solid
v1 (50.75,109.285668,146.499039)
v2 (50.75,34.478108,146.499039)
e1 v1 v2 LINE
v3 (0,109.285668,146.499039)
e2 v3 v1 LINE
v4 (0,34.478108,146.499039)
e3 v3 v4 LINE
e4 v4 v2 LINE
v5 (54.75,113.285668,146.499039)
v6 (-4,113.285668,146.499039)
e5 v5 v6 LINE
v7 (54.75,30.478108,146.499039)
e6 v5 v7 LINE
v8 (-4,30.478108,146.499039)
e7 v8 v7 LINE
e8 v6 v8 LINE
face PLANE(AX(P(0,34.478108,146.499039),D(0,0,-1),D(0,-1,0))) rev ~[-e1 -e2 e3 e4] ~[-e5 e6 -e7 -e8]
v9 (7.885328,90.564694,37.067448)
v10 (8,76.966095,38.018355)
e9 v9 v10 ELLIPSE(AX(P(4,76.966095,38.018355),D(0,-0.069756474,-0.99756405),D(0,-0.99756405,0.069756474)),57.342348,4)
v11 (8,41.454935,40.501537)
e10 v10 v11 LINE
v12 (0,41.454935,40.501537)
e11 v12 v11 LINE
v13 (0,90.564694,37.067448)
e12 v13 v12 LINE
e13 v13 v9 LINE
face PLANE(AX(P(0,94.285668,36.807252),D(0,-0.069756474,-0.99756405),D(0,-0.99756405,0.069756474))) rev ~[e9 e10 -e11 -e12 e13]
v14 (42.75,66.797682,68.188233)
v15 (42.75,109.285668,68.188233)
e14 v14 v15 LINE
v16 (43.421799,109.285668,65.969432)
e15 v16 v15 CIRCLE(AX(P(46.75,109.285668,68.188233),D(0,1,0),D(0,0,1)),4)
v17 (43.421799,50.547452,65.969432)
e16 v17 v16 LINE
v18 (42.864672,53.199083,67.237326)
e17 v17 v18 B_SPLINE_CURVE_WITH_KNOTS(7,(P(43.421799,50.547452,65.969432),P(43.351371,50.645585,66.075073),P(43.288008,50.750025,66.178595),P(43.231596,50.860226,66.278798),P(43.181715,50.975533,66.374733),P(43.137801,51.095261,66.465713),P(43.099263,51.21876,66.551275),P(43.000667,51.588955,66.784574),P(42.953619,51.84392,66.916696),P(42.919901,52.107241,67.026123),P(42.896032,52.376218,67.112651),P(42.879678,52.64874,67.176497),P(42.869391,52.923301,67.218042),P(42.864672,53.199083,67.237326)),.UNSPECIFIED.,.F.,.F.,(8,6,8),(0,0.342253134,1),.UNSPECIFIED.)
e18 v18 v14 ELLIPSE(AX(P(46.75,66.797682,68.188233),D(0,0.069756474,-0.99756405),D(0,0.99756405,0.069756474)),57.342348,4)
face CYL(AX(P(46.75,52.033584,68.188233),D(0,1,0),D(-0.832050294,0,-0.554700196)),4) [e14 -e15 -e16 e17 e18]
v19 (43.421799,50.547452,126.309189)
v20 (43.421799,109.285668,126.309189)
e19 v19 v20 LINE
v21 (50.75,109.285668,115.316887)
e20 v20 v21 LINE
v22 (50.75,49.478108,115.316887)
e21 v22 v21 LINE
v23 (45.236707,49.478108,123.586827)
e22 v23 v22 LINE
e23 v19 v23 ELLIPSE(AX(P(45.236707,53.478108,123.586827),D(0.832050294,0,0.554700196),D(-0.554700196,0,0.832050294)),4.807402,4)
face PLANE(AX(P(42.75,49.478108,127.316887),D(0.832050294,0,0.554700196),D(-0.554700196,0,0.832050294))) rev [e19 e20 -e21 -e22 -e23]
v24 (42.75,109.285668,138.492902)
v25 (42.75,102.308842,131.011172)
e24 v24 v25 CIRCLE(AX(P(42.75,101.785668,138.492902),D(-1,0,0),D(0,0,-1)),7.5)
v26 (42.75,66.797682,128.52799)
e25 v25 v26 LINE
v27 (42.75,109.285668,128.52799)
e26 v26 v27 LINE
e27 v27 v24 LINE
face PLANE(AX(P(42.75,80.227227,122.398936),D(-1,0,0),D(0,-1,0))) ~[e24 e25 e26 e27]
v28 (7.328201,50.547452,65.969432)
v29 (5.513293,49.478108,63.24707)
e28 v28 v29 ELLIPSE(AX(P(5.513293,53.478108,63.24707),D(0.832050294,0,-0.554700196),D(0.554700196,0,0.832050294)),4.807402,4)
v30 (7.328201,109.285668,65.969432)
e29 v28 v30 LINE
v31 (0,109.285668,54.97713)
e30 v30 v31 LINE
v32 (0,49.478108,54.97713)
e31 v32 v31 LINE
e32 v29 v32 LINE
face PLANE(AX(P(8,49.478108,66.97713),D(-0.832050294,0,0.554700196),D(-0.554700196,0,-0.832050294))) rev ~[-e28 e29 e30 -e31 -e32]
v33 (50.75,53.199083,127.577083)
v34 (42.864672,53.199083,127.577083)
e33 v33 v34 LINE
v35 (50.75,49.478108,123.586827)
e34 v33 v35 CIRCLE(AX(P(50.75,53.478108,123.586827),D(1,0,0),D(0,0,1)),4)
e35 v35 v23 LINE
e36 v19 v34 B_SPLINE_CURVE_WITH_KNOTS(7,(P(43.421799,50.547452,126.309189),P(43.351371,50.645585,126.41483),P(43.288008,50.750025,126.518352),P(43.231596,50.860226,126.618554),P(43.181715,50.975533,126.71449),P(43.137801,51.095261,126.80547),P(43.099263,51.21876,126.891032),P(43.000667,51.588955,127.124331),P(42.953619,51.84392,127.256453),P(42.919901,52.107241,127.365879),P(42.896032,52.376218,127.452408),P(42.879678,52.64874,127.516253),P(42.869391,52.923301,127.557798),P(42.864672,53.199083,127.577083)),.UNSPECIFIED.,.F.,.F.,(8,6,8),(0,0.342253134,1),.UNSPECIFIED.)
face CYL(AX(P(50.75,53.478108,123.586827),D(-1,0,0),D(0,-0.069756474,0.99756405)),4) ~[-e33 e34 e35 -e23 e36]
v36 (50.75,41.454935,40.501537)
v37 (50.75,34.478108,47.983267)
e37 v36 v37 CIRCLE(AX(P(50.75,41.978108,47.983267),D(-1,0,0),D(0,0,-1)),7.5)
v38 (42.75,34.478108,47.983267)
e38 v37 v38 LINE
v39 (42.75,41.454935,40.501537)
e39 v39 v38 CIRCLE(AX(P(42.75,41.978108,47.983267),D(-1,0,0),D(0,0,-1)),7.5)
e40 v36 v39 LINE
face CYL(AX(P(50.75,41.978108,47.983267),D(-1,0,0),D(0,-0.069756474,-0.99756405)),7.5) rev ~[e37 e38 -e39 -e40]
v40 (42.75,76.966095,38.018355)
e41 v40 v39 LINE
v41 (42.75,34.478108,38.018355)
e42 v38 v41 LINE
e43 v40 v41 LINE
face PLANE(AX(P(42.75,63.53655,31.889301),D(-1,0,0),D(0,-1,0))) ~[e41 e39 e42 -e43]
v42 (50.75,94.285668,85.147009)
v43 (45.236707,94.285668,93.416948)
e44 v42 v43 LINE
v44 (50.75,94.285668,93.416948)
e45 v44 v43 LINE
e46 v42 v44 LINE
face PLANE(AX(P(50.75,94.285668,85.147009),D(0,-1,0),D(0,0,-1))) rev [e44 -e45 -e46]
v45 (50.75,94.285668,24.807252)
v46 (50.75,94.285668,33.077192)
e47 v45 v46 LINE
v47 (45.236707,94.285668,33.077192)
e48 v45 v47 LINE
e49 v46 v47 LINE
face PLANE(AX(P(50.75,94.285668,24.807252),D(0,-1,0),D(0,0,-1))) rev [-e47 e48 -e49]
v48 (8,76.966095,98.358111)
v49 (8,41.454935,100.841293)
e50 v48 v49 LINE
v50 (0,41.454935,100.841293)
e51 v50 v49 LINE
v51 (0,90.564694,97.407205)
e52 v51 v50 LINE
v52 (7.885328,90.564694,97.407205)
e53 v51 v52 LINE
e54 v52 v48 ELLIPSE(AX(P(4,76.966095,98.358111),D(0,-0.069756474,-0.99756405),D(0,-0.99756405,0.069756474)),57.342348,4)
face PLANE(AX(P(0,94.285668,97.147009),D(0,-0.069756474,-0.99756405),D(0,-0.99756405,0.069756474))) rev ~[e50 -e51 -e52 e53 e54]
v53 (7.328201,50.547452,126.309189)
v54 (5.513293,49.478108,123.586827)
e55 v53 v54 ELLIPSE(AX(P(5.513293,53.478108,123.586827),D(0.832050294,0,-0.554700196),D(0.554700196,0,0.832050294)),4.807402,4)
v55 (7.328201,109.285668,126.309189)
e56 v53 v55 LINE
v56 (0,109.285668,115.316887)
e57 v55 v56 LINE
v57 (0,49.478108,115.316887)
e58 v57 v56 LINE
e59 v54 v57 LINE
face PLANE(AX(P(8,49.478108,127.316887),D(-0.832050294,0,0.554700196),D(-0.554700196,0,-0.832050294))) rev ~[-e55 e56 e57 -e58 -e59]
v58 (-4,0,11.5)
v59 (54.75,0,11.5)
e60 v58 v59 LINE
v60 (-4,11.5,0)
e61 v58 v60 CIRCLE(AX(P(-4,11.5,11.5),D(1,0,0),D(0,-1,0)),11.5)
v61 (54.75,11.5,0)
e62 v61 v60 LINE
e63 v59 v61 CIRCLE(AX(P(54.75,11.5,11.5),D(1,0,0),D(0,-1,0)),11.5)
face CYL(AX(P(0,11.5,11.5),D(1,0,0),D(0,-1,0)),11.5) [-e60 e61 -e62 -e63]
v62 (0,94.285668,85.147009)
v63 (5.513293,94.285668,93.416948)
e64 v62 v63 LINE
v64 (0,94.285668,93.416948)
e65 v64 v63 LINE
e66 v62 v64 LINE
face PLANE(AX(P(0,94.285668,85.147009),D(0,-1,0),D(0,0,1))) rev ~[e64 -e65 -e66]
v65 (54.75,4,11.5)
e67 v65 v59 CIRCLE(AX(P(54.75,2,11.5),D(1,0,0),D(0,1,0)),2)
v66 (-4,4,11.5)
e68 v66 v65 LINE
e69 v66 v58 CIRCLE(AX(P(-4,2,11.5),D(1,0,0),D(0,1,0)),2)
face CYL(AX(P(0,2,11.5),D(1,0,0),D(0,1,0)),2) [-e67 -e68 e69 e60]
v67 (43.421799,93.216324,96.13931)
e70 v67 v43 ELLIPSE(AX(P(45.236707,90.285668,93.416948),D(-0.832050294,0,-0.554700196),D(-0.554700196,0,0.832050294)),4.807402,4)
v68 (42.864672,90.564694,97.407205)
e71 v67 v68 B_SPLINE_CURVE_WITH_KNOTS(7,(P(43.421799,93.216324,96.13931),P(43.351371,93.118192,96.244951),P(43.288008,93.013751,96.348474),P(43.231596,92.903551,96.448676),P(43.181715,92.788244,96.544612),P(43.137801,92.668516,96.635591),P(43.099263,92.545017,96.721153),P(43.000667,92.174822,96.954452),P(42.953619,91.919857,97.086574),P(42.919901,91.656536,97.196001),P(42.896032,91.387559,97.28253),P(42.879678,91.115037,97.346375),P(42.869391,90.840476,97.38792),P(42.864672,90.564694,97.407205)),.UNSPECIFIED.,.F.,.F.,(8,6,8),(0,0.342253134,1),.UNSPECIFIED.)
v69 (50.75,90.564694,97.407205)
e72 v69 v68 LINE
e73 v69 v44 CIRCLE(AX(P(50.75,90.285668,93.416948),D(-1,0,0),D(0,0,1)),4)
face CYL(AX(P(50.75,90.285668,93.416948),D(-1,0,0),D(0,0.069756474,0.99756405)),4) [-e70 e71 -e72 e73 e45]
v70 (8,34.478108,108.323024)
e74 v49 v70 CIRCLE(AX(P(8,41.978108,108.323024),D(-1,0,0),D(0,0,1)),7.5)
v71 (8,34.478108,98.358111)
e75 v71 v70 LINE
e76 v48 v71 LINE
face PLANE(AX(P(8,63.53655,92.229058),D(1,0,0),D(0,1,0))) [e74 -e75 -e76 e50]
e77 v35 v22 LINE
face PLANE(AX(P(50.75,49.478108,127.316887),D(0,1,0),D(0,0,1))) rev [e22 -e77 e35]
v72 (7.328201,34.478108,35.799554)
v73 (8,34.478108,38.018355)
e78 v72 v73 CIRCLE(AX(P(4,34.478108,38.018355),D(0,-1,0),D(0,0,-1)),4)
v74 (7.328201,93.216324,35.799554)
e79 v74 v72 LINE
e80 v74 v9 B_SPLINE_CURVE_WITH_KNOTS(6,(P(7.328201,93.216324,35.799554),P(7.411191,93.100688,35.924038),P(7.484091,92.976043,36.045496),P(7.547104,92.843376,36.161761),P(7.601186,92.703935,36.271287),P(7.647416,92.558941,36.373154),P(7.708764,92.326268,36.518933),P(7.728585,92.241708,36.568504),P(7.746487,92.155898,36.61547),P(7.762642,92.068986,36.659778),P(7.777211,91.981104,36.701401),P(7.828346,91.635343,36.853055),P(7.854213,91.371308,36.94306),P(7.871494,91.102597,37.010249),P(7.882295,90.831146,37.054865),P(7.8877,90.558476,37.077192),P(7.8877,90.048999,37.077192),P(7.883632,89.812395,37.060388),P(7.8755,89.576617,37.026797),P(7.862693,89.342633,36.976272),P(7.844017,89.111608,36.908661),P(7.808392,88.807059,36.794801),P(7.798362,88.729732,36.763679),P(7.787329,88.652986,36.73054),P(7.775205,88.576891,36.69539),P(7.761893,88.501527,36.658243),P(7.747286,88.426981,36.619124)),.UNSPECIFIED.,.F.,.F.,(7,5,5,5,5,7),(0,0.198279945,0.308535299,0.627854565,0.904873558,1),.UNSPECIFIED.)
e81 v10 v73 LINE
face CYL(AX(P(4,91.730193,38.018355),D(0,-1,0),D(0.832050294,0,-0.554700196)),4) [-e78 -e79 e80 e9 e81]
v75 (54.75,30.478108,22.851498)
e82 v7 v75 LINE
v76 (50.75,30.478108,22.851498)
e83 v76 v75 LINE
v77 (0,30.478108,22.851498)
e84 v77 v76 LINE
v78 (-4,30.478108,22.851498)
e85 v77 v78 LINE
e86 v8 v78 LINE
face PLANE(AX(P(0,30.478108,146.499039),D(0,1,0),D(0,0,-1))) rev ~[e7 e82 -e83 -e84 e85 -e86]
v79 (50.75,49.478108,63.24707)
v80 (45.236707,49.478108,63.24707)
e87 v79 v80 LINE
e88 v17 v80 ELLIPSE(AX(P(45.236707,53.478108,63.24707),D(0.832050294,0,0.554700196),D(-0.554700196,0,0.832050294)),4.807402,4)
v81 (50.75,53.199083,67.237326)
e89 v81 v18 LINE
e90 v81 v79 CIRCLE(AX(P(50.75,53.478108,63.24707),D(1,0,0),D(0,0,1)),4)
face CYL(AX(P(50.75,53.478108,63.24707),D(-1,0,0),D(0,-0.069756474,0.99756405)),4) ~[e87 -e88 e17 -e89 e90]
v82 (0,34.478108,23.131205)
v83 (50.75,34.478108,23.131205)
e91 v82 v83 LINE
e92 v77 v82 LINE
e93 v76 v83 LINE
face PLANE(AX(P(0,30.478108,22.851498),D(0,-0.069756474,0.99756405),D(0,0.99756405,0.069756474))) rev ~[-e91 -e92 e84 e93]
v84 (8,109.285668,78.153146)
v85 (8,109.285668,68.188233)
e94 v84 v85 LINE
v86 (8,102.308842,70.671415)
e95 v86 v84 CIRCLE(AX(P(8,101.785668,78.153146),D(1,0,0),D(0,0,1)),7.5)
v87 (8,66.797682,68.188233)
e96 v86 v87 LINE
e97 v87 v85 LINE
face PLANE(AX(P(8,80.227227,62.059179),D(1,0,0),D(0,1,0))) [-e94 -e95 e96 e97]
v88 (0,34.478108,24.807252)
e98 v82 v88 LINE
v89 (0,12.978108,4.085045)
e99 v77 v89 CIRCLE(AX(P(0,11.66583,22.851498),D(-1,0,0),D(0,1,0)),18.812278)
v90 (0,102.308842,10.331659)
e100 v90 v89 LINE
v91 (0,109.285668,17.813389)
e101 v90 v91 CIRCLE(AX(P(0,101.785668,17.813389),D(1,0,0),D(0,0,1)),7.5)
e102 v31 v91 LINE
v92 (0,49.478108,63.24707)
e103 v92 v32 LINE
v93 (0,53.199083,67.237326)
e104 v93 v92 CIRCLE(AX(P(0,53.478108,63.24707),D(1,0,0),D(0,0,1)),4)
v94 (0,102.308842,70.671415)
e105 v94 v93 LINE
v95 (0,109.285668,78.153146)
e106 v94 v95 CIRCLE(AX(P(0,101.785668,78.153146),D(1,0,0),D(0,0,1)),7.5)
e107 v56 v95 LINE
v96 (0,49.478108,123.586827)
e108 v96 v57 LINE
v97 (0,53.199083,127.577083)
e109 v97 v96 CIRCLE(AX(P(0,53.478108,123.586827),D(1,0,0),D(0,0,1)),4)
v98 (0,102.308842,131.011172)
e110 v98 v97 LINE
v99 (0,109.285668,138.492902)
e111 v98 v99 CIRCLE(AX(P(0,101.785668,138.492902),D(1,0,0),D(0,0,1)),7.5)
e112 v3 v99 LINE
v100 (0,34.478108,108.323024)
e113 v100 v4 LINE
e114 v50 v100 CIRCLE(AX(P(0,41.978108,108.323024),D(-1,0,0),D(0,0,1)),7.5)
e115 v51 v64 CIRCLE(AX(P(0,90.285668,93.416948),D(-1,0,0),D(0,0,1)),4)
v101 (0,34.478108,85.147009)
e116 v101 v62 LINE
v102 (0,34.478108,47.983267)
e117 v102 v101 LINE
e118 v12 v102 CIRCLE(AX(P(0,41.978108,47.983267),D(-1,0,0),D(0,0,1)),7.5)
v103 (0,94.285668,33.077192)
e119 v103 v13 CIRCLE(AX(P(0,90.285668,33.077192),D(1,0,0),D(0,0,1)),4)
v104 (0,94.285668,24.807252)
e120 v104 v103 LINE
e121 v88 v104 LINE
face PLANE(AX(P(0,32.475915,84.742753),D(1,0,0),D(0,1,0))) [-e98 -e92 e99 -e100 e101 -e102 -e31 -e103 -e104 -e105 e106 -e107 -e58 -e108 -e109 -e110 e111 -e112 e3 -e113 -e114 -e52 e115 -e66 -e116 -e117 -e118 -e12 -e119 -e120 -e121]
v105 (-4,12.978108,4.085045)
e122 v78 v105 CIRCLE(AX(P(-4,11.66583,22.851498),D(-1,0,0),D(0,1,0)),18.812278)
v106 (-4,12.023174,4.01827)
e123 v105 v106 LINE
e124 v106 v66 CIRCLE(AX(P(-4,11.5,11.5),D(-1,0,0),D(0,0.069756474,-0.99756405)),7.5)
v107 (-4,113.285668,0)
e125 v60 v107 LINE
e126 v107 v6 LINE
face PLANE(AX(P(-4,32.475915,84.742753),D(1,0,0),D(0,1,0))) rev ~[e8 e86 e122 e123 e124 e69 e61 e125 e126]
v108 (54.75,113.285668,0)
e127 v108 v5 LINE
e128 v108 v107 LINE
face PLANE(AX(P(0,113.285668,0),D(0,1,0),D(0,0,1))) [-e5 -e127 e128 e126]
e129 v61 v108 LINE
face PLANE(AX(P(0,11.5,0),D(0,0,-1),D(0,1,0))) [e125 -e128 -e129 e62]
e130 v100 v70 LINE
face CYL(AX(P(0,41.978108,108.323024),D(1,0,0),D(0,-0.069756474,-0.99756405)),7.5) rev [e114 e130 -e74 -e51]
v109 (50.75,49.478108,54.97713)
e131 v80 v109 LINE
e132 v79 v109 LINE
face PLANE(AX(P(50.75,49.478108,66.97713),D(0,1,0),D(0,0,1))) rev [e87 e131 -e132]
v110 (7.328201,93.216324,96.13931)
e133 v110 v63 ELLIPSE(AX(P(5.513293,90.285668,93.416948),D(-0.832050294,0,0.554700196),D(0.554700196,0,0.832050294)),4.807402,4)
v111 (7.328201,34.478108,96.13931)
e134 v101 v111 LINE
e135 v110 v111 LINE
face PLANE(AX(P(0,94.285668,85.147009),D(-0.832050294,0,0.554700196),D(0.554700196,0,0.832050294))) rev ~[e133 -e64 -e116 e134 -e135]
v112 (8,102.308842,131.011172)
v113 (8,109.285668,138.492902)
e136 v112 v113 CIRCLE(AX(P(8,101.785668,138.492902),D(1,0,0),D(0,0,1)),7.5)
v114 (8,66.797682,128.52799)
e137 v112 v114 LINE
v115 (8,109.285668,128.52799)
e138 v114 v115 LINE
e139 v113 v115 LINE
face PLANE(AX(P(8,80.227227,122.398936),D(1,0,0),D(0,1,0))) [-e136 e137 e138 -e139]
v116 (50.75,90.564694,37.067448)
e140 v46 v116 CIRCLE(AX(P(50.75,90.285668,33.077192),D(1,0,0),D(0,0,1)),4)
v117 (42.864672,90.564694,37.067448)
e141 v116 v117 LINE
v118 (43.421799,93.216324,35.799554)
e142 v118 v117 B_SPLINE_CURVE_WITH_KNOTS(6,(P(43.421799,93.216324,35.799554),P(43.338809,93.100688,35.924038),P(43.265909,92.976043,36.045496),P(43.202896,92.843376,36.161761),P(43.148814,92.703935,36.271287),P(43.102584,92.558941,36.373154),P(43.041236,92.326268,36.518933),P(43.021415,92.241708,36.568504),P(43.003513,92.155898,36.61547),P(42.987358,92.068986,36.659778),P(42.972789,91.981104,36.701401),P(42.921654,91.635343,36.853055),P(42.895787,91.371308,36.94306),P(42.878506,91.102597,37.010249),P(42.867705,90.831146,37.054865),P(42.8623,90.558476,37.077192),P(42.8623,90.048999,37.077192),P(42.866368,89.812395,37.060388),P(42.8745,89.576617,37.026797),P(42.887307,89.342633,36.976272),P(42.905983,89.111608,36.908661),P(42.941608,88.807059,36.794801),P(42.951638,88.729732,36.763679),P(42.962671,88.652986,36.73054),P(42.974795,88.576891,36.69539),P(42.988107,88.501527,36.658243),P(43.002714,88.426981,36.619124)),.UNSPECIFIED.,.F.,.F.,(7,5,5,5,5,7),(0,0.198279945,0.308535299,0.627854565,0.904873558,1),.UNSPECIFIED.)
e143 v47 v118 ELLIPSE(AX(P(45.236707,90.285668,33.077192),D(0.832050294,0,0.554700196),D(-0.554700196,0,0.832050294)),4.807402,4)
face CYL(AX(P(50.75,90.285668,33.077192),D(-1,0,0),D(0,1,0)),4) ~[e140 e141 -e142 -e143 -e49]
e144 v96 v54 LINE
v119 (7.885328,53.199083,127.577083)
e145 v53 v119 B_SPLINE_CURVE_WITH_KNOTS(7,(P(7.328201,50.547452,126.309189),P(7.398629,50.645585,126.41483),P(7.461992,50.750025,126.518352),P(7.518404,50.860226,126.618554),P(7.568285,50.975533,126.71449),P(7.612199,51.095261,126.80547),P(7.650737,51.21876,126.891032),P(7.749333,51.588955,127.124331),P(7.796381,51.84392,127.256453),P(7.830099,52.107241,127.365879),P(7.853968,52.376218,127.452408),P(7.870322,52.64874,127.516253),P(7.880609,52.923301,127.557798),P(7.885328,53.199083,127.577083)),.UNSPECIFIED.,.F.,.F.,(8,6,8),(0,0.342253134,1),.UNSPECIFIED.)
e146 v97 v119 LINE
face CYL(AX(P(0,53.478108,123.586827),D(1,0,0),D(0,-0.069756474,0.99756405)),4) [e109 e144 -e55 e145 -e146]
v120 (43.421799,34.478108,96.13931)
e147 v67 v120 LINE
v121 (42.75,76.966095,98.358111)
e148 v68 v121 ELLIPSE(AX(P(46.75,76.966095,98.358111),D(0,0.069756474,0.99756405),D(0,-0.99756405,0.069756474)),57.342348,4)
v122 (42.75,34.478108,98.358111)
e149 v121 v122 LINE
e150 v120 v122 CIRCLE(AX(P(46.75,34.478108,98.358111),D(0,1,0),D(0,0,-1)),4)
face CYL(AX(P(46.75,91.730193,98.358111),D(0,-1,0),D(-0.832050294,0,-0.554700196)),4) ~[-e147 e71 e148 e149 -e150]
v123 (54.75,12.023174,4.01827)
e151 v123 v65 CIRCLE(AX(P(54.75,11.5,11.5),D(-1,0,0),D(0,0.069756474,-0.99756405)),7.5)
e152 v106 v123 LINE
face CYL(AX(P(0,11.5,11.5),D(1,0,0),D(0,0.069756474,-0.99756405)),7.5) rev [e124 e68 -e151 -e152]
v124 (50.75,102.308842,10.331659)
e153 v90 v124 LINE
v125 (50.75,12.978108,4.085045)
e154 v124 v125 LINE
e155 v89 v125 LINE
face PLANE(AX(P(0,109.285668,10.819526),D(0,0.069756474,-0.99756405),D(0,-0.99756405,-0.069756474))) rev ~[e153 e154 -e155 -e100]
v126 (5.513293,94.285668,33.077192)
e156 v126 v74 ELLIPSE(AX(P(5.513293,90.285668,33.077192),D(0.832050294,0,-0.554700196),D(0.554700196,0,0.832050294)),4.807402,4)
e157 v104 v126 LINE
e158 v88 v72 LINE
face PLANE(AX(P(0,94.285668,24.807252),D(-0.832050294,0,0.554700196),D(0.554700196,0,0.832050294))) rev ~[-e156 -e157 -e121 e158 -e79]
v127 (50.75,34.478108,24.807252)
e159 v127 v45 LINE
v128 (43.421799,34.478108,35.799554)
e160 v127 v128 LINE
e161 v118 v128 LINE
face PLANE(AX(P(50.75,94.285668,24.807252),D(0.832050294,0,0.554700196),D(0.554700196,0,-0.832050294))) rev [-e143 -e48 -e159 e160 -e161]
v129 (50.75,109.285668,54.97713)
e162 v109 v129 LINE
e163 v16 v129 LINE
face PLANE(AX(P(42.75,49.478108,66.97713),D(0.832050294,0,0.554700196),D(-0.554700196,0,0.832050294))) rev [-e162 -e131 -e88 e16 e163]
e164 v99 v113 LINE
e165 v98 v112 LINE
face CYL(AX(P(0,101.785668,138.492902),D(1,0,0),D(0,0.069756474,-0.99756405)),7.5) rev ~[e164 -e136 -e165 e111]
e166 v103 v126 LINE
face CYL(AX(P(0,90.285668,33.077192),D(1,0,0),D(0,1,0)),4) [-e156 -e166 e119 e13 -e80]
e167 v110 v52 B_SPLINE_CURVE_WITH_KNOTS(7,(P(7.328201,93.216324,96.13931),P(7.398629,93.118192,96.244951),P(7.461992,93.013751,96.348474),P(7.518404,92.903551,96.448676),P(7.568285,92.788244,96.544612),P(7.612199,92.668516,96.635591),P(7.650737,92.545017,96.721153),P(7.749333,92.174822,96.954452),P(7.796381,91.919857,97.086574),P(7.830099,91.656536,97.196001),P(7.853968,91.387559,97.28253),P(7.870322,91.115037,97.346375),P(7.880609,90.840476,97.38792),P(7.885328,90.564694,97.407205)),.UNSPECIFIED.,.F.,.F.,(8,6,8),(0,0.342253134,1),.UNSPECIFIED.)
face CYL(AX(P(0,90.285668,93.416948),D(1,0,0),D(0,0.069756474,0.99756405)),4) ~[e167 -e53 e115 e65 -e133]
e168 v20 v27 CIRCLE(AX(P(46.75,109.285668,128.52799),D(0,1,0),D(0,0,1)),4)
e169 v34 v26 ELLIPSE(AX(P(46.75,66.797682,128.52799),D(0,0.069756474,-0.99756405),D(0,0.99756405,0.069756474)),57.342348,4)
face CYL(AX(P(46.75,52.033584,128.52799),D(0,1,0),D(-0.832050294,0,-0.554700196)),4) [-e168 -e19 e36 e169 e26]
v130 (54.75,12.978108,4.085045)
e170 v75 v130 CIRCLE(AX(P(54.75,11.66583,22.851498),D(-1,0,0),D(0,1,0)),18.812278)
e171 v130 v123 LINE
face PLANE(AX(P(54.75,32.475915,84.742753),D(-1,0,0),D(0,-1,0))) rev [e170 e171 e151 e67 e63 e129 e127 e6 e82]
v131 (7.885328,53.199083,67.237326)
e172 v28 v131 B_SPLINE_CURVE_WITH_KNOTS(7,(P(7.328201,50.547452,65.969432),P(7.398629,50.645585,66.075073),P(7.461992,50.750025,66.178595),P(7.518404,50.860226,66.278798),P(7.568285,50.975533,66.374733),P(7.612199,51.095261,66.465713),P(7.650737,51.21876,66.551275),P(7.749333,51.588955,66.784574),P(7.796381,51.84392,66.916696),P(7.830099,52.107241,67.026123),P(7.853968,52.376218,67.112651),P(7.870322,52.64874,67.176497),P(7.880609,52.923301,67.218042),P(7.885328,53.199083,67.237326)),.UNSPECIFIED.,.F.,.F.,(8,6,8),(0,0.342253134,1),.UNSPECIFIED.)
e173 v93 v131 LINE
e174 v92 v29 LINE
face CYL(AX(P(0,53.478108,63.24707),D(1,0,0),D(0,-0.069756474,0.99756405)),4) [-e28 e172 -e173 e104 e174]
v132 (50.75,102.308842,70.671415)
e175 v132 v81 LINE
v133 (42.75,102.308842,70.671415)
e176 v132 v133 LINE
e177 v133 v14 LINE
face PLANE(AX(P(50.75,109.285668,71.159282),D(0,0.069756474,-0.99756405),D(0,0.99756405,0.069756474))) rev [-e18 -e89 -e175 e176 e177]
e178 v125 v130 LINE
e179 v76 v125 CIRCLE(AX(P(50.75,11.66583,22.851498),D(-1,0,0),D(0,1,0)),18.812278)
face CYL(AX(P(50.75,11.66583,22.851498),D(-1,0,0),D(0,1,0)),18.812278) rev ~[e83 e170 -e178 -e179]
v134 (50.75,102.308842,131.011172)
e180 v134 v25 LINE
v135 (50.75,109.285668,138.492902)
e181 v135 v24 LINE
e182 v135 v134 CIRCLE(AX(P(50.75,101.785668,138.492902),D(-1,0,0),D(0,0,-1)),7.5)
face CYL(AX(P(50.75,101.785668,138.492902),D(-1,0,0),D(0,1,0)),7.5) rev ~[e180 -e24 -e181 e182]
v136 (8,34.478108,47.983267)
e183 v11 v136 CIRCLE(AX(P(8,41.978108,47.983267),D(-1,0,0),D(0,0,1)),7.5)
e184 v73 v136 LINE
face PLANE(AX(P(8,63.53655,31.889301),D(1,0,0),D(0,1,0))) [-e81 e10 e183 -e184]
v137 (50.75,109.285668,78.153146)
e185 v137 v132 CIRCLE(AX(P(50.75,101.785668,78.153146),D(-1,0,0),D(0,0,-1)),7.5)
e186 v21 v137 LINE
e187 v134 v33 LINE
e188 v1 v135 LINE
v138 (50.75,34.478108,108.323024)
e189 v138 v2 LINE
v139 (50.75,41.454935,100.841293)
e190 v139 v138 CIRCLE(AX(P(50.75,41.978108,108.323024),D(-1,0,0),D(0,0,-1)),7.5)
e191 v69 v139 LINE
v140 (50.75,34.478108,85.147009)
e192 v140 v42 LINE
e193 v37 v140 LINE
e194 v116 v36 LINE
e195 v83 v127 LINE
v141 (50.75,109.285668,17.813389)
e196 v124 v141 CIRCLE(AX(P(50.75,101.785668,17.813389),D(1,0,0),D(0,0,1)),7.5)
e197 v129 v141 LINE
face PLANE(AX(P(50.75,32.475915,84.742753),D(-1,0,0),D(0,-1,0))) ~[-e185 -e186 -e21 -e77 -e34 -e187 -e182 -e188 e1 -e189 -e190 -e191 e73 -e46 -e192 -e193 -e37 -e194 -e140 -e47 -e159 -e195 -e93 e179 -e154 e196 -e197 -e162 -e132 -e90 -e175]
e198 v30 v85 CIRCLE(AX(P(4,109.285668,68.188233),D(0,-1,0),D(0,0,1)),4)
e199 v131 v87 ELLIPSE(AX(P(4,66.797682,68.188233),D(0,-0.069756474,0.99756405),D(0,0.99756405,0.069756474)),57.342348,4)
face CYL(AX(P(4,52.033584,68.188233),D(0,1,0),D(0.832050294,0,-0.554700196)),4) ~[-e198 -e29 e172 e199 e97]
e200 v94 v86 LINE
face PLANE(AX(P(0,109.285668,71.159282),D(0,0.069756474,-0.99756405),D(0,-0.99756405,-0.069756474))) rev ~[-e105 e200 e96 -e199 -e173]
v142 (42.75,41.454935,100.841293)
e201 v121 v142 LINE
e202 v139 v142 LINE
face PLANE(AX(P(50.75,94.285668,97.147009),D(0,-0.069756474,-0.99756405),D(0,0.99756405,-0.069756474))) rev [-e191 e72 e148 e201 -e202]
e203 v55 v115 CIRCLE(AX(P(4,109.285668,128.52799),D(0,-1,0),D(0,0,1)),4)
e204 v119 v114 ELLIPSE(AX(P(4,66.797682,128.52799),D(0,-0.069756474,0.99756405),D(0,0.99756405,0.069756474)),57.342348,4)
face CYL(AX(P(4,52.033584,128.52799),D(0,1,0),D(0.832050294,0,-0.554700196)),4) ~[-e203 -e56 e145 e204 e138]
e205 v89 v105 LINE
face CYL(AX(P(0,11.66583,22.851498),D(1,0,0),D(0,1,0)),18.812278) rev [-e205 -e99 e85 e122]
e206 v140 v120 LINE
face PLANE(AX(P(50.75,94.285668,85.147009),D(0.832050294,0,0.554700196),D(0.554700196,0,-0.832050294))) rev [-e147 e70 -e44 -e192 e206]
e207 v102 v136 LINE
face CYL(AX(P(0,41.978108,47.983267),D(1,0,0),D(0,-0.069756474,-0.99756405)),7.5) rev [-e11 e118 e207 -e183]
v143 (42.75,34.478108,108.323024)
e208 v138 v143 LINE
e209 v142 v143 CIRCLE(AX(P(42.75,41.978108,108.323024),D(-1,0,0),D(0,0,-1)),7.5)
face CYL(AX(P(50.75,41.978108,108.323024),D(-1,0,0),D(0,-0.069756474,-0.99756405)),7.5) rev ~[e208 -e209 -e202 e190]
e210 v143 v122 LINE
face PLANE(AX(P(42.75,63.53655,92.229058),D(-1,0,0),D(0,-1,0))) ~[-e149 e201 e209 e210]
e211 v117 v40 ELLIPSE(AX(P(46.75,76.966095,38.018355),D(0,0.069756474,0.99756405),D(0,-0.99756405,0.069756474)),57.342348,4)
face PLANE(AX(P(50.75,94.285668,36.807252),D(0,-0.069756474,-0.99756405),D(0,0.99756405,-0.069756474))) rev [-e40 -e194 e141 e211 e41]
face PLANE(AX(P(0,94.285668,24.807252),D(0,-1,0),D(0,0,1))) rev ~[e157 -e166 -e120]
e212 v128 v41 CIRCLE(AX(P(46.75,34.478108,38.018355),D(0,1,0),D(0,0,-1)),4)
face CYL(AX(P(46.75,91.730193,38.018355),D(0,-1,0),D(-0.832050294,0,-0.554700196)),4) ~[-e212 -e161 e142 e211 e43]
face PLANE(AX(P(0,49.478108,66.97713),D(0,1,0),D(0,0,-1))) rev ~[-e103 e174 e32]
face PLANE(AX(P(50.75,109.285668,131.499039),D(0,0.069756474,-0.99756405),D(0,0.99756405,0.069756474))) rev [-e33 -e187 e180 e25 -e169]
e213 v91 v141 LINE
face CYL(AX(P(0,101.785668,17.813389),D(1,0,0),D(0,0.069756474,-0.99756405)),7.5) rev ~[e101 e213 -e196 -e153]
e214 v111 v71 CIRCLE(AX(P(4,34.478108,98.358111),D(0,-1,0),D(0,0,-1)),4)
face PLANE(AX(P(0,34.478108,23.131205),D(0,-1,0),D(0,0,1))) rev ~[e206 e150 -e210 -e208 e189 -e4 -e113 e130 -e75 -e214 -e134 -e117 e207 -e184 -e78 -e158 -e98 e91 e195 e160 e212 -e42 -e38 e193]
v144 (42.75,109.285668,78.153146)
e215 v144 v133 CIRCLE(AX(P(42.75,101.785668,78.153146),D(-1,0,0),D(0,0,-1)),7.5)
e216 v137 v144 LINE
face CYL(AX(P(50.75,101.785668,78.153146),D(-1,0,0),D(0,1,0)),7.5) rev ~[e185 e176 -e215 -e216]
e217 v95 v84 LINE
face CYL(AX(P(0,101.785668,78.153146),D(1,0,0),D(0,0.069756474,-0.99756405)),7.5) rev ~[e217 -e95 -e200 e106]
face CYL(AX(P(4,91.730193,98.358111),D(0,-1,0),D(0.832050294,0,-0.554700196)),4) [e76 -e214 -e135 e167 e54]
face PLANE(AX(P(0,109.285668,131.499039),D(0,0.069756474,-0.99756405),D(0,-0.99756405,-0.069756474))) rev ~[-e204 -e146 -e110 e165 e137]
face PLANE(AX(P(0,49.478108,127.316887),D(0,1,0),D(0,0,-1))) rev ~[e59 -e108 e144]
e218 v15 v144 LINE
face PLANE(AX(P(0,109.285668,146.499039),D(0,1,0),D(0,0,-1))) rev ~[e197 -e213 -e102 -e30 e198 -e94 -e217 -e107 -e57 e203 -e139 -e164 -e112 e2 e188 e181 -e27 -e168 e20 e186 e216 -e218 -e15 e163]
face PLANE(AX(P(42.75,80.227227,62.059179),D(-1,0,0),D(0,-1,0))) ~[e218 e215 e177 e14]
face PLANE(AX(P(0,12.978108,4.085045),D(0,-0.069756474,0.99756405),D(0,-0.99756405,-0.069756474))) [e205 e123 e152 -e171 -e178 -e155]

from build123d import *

# Parameters (mm, degrees)
F1_DEPTH  = 4
F2_DEPTH  = 8
F4_DEPTH  = 59.8075599705
F6_DEPTH  = 59.8075599705
F8_DEPTH  = 59.8075599705
F10_DEPTH = 59.8075599705
F11_F1_R  = 4
F11_F2_R  = 4
F11_F3_R  = 4
F11_F4_R  = 4
F11_F5_R  = 4
F11_F6_R  = 4
F11_F7_R  = 4
F11_F8_R  = 4
F14_DEPTH = 50.75
F15_R     = 7.5


with BuildPart() as f1:
    # F0 (on Right) → F1 (new body)
    with BuildSketch(Plane.YZ):
        Polygon((34.4781084829, 146.4990389768), (30.4781084829, 146.4990389768), (30.4781084829, 22.8514976037), (34.4781084829, 23.1312048515), (34.4781084829, 24.8072521052), (34.4781084829, 40.989404104), (34.4781084829, 85.147008687), (34.4781084829, 101.3291606859), align=None)
        Polygon((109.2856684534, 146.4990389768), (34.4781084829, 146.4990389768), (34.4781084829, 101.3291606859), (94.2856684534, 97.147008687), (94.2856684534, 85.147008687), (34.4781084829, 85.147008687), (34.4781084829, 40.989404104), (94.2856684534, 36.8072521052), (94.2856684534, 24.8072521052), (34.4781084829, 24.8072521052), (34.4781084829, 23.1312048515), (30.4781084829, 22.8514976037), (30.4781084829, 5.3087643873), (109.2856684534, 10.8195258131), (109.2856684534, 54.9771303961), (49.4781084829, 54.9771303961), (49.4781084829, 66.9771303961), (109.2856684534, 71.159282395), (109.2856684534, 115.3168869779), (49.4781084829, 115.3168869779), (49.4781084829, 127.3168869779), (109.2856684534, 131.4990389768), align=None)
        Polygon((109.2856684534, 115.3168869779), (109.2856684534, 131.4990389768), (49.4781084829, 127.3168869779), (49.4781084829, 115.3168869779), align=None)
        Polygon((94.2856684534, 97.147008687), (34.4781084829, 101.3291606859), (34.4781084829, 85.147008687), (94.2856684534, 85.147008687), align=None)
        Polygon((49.4781084829, 54.9771303961), (109.2856684534, 54.9771303961), (109.2856684534, 71.159282395), (49.4781084829, 66.9771303961), align=None)
        Polygon((34.4781084829, 40.989404104), (34.4781084829, 24.8072521052), (94.2856684534, 24.8072521052), (94.2856684534, 36.8072521052), align=None)
        Polygon((113.2856684534, 146.4990389768), (109.2856684534, 146.4990389768), (109.2856684534, 131.4990389768), (109.2856684534, 115.3168869779), (109.2856684534, 71.159282395), (109.2856684534, 54.9771303961), (109.2856684534, 10.8195258131), (30.4781084829, 5.3087643873), (30.4781084829, 0), (113.2856684534, 0), align=None)
        with BuildLine():
            Line((30.4781084829, 0), (30.4781084829, 5.3087643873))
            Line((30.4781084829, 5.3087643873), (12.9781084829, 4.0850451783))
            Line((12.9781084829, 4.0850451783), (12.0231735531, 4.0182696231))
            ThreePointArc((12.0231735531, 4.0182696231), (6.3850122995, 6.0148472379), (4, 11.5))
            ThreePointArc((4, 11.5), (2, 13.5), (0, 11.5))
            ThreePointArc((0, 11.5), (3.3682720164, 3.3682720164), (11.5, 0))
            Line((11.5, 0), (30.4781084829, 0))
        make_face()
        with BuildLine():
            Line((30.4781084829, 5.3087643873), (30.4781084829, 22.8514976037))
            ThreePointArc((30.4781084829, 22.8514976037), (25.4242595831, 10.0215547294), (12.9781084829, 4.0850451783))
            Line((12.9781084829, 4.0850451783), (30.4781084829, 5.3087643873))
        make_face()
    extrude(amount=-F1_DEPTH)

    # F0 (on Right) → F2 (join)
    with BuildSketch(Plane.YZ):
        Polygon((109.2856684534, 115.3168869779), (109.2856684534, 131.4990389768), (49.4781084829, 127.3168869779), (49.4781084829, 115.3168869779), align=None)
        Polygon((94.2856684534, 97.147008687), (34.4781084829, 101.3291606859), (34.4781084829, 85.147008687), (94.2856684534, 85.147008687), align=None)
        Polygon((49.4781084829, 54.9771303961), (109.2856684534, 54.9771303961), (109.2856684534, 71.159282395), (49.4781084829, 66.9771303961), align=None)
        Polygon((34.4781084829, 40.989404104), (34.4781084829, 24.8072521052), (94.2856684534, 24.8072521052), (94.2856684534, 36.8072521052), align=None)
    extrude(amount=F2_DEPTH)

    # F3 (on face) → F4 (cut, through all)
    with BuildSketch(Plane.XZ.offset(-49.4781084829)):
        Polygon((0, 115.3168869779), (8, 115.3168869779), (8, 127.3168869779), align=None)
    extrude(amount=-F4_DEPTH, mode=Mode.SUBTRACT)

    # F5 (on face) → F6 (cut, through all)
    with BuildSketch(Plane(origin=(0, 94.2856684534, 0), x_dir=(-1, 0, 0), z_dir=(0, 1, 0))):
        Polygon((-8, 85.147008687), (0, 85.147008687), (-8, 97.147008687), align=None)
    extrude(amount=-F6_DEPTH, mode=Mode.SUBTRACT)

    # F7 (on face) → F8 (cut, through all)
    with BuildSketch(Plane.XZ.offset(-49.4781084829)):
        Polygon((8, 66.9771303961), (0, 54.9771303961), (8, 54.9771303961), align=None)
    extrude(amount=-F8_DEPTH, mode=Mode.SUBTRACT)

    # F9 (on face) → F10 (cut, through all)
    with BuildSketch(Plane(origin=(0, 94.2856684534, 0), x_dir=(-1, 0, 0), z_dir=(0, 1, 0))):
        Polygon((0, 24.8072521052), (-8, 36.8072521052), (-8, 24.8072521052), align=None)
    extrude(amount=-F10_DEPTH, mode=Mode.SUBTRACT)

    # F11: fillet of radius 4 on 8 edges, made by hand

    # F11_f1
    f11_f1_edges = [f1.edges().sort_by_distance(p)[0] for p in [
        (4, 94.2856684534, 36.8072521052),
    ]]
    fillet(f11_f1_edges, radius=F11_F1_R)

    # F11_f2
    f11_f2_edges = [f1.edges().sort_by_distance(p)[0] for p in [
        (8, 63.1041505096, 36.8072521052),
    ]]
    fillet(f11_f2_edges, radius=F11_F2_R)

    # F11_f3
    f11_f3_edges = [f1.edges().sort_by_distance(p)[0] for p in [
        (4, 49.4781084829, 66.9771303961),
    ]]
    fillet(f11_f3_edges, radius=F11_F3_R)

    # F11_f4
    f11_f4_edges = [f1.edges().sort_by_distance(p)[0] for p in [
        (8, 80.6596264267, 66.9771303961),
    ]]
    fillet(f11_f4_edges, radius=F11_F4_R)

    # F11_f5
    f11_f5_edges = [f1.edges().sort_by_distance(p)[0] for p in [
        (4, 94.2856684534, 97.147008687),
    ]]
    fillet(f11_f5_edges, radius=F11_F5_R)

    # F11_f6
    f11_f6_edges = [f1.edges().sort_by_distance(p)[0] for p in [
        (8, 63.1041505096, 97.147008687),
    ]]
    fillet(f11_f6_edges, radius=F11_F6_R)

    # F11_f7
    f11_f7_edges = [f1.edges().sort_by_distance(p)[0] for p in [
        (4, 49.4781084829, 127.3168869779),
    ]]
    fillet(f11_f7_edges, radius=F11_F7_R)

    # F11_f8
    f11_f8_edges = [f1.edges().sort_by_distance(p)[0] for p in [
        (8, 80.6596264267, 127.3168869779),
    ]]
    fillet(f11_f8_edges, radius=F11_F8_R)


with BuildPart() as f12_1:
    # F12: instance of F1
    add(f1.part.mirror(Plane(origin=(0, 70.5723781379, 70.1443425212), x_dir=(0, 1, 0), z_dir=(1, 0, 0))))


with BuildPart() as f12_1_1:
    # F13: moved
    add(f12_1.part.moved(Location((50.75, 0, 0))))


with BuildPart() as f1_1:
    add(f1.part)

    add(f12_1_1.part)  # F14 merges F12_1
    # F0 (on Right) → F14 (join, through all)
    with BuildSketch(Plane.YZ):
        Polygon((34.4781084829, 146.4990389768), (30.4781084829, 146.4990389768), (30.4781084829, 22.8514976037), (34.4781084829, 23.1312048515), (34.4781084829, 24.8072521052), (34.4781084829, 40.989404104), (34.4781084829, 85.147008687), (34.4781084829, 101.3291606859), align=None)
        Polygon((113.2856684534, 146.4990389768), (109.2856684534, 146.4990389768), (109.2856684534, 131.4990389768), (109.2856684534, 115.3168869779), (109.2856684534, 71.159282395), (109.2856684534, 54.9771303961), (109.2856684534, 10.8195258131), (30.4781084829, 5.3087643873), (30.4781084829, 0), (113.2856684534, 0), align=None)
        with BuildLine():
            Line((30.4781084829, 0), (30.4781084829, 5.3087643873))
            Line((30.4781084829, 5.3087643873), (12.9781084829, 4.0850451783))
            Line((12.9781084829, 4.0850451783), (12.0231735531, 4.0182696231))
            ThreePointArc((12.0231735531, 4.0182696231), (6.3850122995, 6.0148472379), (4, 11.5))
            ThreePointArc((4, 11.5), (2, 13.5), (0, 11.5))
            ThreePointArc((0, 11.5), (3.3682720164, 3.3682720164), (11.5, 0))
            Line((11.5, 0), (30.4781084829, 0))
        make_face()
    extrude(amount=F14_DEPTH)

    # F15
    f15_edges = [f1_1.edges().sort_by_distance(p)[0] for p in [
        (4, 109.285668, 131.499039),
        (4, 109.285668, 71.159282),
        (46.75, 109.285668, 71.159282),
        (46.75, 109.285668, 131.499039),
        (4, 34.478108, 40.989404),
        (4, 34.478108, 101.329161),
        (46.75, 34.478108, 40.989404),
        (46.75, 34.478108, 101.329161),
        (25.375, 109.285668, 10.819526),
    ]]
    fillet(f15_edges, radius=F15_R)


solid = f1_1.part
